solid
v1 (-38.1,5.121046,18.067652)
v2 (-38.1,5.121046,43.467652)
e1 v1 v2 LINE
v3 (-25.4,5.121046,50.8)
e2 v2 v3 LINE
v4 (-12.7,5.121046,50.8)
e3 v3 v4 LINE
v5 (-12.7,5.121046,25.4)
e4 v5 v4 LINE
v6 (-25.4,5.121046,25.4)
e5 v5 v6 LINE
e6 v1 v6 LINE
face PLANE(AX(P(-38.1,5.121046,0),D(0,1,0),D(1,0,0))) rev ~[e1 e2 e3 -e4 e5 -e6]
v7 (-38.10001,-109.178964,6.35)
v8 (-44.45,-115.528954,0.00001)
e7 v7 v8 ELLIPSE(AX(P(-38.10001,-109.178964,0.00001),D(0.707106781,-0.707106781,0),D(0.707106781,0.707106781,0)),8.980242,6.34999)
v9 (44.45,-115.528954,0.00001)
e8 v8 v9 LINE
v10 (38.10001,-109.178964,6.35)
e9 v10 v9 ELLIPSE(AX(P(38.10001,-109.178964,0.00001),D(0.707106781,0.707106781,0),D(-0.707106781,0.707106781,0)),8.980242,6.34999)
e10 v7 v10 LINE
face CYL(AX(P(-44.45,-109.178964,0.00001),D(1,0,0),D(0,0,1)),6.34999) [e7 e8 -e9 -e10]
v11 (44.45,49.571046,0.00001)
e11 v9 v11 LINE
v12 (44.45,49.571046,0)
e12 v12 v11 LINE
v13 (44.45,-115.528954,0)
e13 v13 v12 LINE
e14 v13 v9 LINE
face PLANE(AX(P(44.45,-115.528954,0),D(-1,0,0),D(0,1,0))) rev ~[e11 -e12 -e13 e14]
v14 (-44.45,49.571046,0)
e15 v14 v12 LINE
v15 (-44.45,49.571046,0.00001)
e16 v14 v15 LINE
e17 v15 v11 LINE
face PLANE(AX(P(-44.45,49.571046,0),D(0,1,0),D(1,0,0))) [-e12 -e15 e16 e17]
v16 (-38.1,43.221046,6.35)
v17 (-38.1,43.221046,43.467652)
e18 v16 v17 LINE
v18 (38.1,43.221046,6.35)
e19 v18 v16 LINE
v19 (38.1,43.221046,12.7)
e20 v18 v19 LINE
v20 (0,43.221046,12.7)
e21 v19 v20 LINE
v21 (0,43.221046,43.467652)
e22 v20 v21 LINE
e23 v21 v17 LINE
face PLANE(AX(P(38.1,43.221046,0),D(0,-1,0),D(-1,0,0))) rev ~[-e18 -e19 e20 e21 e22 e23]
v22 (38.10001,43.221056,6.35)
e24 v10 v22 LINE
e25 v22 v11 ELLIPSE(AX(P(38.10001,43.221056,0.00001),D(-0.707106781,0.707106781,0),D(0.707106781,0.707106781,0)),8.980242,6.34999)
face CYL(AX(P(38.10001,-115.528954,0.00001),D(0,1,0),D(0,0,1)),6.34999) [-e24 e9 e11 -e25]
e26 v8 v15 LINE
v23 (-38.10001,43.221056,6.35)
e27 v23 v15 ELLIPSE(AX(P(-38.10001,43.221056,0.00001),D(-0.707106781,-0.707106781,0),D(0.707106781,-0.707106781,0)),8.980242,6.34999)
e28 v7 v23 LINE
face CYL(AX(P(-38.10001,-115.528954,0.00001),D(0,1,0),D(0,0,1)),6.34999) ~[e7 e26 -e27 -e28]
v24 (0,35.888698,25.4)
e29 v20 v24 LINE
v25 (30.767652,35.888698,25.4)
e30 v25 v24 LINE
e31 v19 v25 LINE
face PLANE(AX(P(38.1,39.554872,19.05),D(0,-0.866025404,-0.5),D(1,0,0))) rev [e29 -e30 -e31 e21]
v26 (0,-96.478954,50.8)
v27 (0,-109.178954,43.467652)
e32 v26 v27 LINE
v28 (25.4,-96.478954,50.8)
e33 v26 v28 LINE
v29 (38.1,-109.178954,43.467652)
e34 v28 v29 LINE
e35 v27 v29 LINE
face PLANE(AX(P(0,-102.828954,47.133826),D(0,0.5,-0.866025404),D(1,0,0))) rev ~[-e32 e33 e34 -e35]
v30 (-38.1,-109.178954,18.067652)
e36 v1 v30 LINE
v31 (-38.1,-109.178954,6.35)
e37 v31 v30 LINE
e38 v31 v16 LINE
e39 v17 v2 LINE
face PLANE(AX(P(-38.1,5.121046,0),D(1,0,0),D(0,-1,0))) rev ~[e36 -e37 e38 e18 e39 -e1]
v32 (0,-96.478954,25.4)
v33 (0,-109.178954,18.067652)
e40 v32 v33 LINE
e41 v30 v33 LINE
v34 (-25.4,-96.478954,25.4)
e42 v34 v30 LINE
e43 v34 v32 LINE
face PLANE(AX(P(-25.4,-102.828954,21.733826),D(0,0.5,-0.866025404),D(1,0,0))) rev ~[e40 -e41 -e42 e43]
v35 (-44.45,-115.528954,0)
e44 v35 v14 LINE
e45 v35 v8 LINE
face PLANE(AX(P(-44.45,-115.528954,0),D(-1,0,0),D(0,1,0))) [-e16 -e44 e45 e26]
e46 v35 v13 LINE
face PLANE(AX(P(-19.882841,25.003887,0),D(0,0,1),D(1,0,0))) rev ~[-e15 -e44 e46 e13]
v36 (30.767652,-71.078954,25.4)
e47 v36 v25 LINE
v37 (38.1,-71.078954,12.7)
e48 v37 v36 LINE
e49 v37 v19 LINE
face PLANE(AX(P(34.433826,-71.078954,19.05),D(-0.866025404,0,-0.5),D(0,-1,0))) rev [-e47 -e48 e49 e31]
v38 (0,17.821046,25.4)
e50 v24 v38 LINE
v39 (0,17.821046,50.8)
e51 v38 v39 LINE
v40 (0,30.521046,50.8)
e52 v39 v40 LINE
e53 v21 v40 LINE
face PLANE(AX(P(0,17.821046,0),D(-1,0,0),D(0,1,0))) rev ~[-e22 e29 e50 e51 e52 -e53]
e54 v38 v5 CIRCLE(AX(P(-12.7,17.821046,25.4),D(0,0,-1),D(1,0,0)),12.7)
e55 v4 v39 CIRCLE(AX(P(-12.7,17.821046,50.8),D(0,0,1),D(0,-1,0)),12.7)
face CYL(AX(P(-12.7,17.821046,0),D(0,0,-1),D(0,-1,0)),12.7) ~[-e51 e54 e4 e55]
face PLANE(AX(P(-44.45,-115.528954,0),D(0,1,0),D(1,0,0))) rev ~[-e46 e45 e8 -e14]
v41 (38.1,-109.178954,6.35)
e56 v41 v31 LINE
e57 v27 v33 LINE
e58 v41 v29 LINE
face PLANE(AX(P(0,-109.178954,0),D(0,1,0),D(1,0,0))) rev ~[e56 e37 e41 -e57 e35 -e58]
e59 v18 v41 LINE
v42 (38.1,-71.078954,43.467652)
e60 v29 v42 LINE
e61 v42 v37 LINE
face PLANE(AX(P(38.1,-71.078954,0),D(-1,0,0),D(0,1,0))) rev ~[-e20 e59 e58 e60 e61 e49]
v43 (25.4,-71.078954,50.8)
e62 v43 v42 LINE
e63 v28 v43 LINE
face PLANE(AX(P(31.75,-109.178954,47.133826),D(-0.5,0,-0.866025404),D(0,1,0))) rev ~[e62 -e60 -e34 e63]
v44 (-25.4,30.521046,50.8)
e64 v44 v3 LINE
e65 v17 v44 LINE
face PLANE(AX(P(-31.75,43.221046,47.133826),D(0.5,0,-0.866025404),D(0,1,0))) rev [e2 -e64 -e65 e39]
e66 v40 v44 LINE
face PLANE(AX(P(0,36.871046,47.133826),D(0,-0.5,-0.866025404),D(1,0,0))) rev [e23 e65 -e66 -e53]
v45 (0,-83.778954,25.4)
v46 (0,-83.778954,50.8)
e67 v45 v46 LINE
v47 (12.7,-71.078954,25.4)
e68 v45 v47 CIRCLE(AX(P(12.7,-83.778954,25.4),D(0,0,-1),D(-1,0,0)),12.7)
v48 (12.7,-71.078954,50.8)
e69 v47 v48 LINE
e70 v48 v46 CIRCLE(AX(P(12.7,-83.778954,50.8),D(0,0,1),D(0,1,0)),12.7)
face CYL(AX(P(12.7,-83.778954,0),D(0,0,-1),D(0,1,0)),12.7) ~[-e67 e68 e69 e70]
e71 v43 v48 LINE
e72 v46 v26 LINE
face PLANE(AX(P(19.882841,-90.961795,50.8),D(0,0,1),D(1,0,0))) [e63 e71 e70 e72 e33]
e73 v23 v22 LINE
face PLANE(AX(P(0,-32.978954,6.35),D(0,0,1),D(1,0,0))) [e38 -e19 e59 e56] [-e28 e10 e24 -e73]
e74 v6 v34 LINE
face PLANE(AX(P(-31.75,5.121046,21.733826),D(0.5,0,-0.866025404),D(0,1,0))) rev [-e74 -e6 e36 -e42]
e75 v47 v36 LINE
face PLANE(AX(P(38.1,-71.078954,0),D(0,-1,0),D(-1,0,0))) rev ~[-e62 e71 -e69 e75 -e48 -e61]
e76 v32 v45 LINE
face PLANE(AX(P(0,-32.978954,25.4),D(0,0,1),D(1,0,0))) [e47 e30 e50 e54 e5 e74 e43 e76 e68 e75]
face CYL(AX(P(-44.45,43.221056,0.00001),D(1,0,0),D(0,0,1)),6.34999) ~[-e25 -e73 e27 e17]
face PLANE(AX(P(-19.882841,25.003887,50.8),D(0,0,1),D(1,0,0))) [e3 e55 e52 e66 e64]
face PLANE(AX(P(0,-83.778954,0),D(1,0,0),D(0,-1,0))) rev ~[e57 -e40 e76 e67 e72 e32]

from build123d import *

# Parameters (mm, degrees)
F0_W        = 88.9
F0_H        = 165.1
F1_DEPTH    = 6.35
F2_DEPTH    = 50.8
F3_DEPTH    = 25.4
F4_R        = 6.34999
F5_C1_SIZE2 = 12.7
F5_C1_SIZE  = 7.3323484187
F5_C2_SIZE2 = 12.7
F5_C2_SIZE  = 7.3323484187
F5_C3_SIZE2 = 7.3323484187
F5_C3_SIZE  = 12.7
F5_C4_SIZE2 = 12.7
F5_C4_SIZE  = 7.3323484187
F5_C5_SIZE2 = 7.3323484187
F5_C5_SIZE  = 12.7
F5_C6_SIZE2 = 7.3323484187
F5_C6_SIZE  = 12.7
F6_SIZE2    = 7.3323484187
F6_SIZE     = 12.7


# Not quite as in the source:
# - a fillet or chamfer is up to 0.001 mm smaller than in the source, because OpenCascade refuses the exact size


with BuildPart() as f1:
    # F0 (on Top) → F1 (new body)
    with BuildSketch(Plane.XY):
        with Locations((0, -32.9789540072)):
            Rectangle(F0_W, F0_H)
        Polygon((-38.1, 5.1210459928), (-38.1, 43.2210459928), (0, 43.2210459928), (38.1, 43.2210459928), (38.1, -71.0789540072), (38.1, -109.1789540072), (0, -109.1789540072), (-38.1, -109.1789540072), align=None, mode=Mode.SUBTRACT)
    extrude(amount=F1_DEPTH)

    # F0 (on Top) → F2 (join)
    with BuildSketch(Plane.XY):
        with BuildLine():
            Line((0, 43.2210459928), (-38.1, 43.2210459928))
            Line((-38.1, 43.2210459928), (-38.1, 5.1210459928))
            Line((-38.1, 5.1210459928), (-12.7, 5.1210459928))
            ThreePointArc((-12.7, 5.1210459928), (-3.7197438789, 8.8407898717), (0, 17.8210459928))
            Line((0, 17.8210459928), (0, 43.2210459928))
        make_face()
        with BuildLine():
            Line((38.1, -109.1789540072), (38.1, -71.0789540072))
            Line((38.1, -71.0789540072), (12.7, -71.0789540072))
            ThreePointArc((12.7, -71.0789540072), (3.7197438789, -74.7986978861), (0, -83.7789540072))
            Line((0, -83.7789540072), (0, -109.1789540072))
            Line((0, -109.1789540072), (38.1, -109.1789540072))
        make_face()
    extrude(amount=F2_DEPTH)

    # F0 (on Top) → F3 (join)
    with BuildSketch(Plane.XY):
        with BuildLine():
            Line((38.1, 43.2210459928), (0, 43.2210459928))
            Line((0, 43.2210459928), (0, 17.8210459928))
            ThreePointArc((0, 17.8210459928), (-3.7197438789, 8.8407898717), (-12.7, 5.1210459928))
            Line((-12.7, 5.1210459928), (-38.1, 5.1210459928))
            Line((-38.1, 5.1210459928), (-38.1, -109.1789540072))
            Line((-38.1, -109.1789540072), (0, -109.1789540072))
            Line((0, -109.1789540072), (0, -83.7789540072))
            ThreePointArc((0, -83.7789540072), (3.7197438789, -74.7986978861), (12.7, -71.0789540072))
            Line((12.7, -71.0789540072), (38.1, -71.0789540072))
            Line((38.1, -71.0789540072), (38.1, 43.2210459928))
        make_face()
    extrude(amount=F3_DEPTH)

    # F4 (radius 6.35 in the source; OpenCascade refuses exactly that, so slightly less here)
    f4_edges = [f1.edges().sort_by_distance(p)[0] for p in [
        (44.45, -32.978954, 6.35),
        (0, 49.571046, 6.35),
        (0, -115.528954, 6.35),
        (-44.45, -32.978954, 6.35),
    ]]
    fillet(f4_edges, radius=F4_R)

    # F5: chamfer of 12.7 x 7.3323484187 on 6 edges, made by hand

    # F5_c1
    f5_c1_edges = [f1.edges().sort_by_distance(p)[0] for p in [
        (-38.1, 24.1710459928, 50.8),
    ]]
    f5_c1_side = f1.faces().sort_by_distance((-38.1, 24.1710459928, 50.6533530316))[0]
    chamfer(f5_c1_edges, length=F5_C1_SIZE, length2=F5_C1_SIZE2, reference=f5_c1_side)

    # F5_c2
    f5_c2_edges = [f1.edges().sort_by_distance(p)[0] for p in [
        (-38.1, -52.0289540072, 25.4),
    ]]
    f5_c2_side = f1.faces().sort_by_distance((-38.1, -52.0289540072, 25.2533530316))[0]
    chamfer(f5_c2_edges, length=F5_C2_SIZE, length2=F5_C2_SIZE2, reference=f5_c2_side)

    # F5_c3
    f5_c3_edges = [f1.edges().sort_by_distance(p)[0] for p in [
        (19.05, 43.2210459928, 25.4),
    ]]
    f5_c3_side = f1.faces().sort_by_distance((19.05, 43.2210459928, 25.2533530316))[0]
    chamfer(f5_c3_edges, length=F5_C3_SIZE, length2=F5_C3_SIZE2, reference=f5_c3_side)

    # F5_c4
    f5_c4_edges = [f1.edges().sort_by_distance(p)[0] for p in [
        (-12.7, 43.2210459928, 50.8),
    ]]
    f5_c4_side = f1.faces().sort_by_distance((-12.7, 43.2210459928, 50.6533530316))[0]
    chamfer(f5_c4_edges, length=F5_C4_SIZE, length2=F5_C4_SIZE2, reference=f5_c4_side)

    # F5_c5
    f5_c5_edges = [f1.edges().sort_by_distance(p)[0] for p in [
        (38.1, -17.5951282165, 25.4),
    ]]
    f5_c5_side = f1.faces().sort_by_distance((38.1, -17.5951282165, 25.2533530316))[0]
    chamfer(f5_c5_edges, length=F5_C5_SIZE, length2=F5_C5_SIZE2, reference=f5_c5_side)

    # F5_c6
    f5_c6_edges = [f1.edges().sort_by_distance(p)[0] for p in [
        (-12.7, -109.1789540072, 25.4),
    ]]
    f5_c6_side = f1.faces().sort_by_distance((-12.7, -109.0323070388, 25.4))[0]
    chamfer(f5_c6_edges, length=F5_C6_SIZE, length2=F5_C6_SIZE2, reference=f5_c6_side)

    # F6
    f6_edges = [f1.edges().sort_by_distance(p)[0] for p in [
        (19.05, -109.178954, 50.8),
        (38.1, -90.128954, 50.8),
    ]]
    f6_side = f1.faces().sort_by_distance((19.446042, -90.524996, 50.8))[0]
    chamfer(f6_edges, length=F6_SIZE, length2=F6_SIZE2, reference=f6_side)


solid = f1.part
